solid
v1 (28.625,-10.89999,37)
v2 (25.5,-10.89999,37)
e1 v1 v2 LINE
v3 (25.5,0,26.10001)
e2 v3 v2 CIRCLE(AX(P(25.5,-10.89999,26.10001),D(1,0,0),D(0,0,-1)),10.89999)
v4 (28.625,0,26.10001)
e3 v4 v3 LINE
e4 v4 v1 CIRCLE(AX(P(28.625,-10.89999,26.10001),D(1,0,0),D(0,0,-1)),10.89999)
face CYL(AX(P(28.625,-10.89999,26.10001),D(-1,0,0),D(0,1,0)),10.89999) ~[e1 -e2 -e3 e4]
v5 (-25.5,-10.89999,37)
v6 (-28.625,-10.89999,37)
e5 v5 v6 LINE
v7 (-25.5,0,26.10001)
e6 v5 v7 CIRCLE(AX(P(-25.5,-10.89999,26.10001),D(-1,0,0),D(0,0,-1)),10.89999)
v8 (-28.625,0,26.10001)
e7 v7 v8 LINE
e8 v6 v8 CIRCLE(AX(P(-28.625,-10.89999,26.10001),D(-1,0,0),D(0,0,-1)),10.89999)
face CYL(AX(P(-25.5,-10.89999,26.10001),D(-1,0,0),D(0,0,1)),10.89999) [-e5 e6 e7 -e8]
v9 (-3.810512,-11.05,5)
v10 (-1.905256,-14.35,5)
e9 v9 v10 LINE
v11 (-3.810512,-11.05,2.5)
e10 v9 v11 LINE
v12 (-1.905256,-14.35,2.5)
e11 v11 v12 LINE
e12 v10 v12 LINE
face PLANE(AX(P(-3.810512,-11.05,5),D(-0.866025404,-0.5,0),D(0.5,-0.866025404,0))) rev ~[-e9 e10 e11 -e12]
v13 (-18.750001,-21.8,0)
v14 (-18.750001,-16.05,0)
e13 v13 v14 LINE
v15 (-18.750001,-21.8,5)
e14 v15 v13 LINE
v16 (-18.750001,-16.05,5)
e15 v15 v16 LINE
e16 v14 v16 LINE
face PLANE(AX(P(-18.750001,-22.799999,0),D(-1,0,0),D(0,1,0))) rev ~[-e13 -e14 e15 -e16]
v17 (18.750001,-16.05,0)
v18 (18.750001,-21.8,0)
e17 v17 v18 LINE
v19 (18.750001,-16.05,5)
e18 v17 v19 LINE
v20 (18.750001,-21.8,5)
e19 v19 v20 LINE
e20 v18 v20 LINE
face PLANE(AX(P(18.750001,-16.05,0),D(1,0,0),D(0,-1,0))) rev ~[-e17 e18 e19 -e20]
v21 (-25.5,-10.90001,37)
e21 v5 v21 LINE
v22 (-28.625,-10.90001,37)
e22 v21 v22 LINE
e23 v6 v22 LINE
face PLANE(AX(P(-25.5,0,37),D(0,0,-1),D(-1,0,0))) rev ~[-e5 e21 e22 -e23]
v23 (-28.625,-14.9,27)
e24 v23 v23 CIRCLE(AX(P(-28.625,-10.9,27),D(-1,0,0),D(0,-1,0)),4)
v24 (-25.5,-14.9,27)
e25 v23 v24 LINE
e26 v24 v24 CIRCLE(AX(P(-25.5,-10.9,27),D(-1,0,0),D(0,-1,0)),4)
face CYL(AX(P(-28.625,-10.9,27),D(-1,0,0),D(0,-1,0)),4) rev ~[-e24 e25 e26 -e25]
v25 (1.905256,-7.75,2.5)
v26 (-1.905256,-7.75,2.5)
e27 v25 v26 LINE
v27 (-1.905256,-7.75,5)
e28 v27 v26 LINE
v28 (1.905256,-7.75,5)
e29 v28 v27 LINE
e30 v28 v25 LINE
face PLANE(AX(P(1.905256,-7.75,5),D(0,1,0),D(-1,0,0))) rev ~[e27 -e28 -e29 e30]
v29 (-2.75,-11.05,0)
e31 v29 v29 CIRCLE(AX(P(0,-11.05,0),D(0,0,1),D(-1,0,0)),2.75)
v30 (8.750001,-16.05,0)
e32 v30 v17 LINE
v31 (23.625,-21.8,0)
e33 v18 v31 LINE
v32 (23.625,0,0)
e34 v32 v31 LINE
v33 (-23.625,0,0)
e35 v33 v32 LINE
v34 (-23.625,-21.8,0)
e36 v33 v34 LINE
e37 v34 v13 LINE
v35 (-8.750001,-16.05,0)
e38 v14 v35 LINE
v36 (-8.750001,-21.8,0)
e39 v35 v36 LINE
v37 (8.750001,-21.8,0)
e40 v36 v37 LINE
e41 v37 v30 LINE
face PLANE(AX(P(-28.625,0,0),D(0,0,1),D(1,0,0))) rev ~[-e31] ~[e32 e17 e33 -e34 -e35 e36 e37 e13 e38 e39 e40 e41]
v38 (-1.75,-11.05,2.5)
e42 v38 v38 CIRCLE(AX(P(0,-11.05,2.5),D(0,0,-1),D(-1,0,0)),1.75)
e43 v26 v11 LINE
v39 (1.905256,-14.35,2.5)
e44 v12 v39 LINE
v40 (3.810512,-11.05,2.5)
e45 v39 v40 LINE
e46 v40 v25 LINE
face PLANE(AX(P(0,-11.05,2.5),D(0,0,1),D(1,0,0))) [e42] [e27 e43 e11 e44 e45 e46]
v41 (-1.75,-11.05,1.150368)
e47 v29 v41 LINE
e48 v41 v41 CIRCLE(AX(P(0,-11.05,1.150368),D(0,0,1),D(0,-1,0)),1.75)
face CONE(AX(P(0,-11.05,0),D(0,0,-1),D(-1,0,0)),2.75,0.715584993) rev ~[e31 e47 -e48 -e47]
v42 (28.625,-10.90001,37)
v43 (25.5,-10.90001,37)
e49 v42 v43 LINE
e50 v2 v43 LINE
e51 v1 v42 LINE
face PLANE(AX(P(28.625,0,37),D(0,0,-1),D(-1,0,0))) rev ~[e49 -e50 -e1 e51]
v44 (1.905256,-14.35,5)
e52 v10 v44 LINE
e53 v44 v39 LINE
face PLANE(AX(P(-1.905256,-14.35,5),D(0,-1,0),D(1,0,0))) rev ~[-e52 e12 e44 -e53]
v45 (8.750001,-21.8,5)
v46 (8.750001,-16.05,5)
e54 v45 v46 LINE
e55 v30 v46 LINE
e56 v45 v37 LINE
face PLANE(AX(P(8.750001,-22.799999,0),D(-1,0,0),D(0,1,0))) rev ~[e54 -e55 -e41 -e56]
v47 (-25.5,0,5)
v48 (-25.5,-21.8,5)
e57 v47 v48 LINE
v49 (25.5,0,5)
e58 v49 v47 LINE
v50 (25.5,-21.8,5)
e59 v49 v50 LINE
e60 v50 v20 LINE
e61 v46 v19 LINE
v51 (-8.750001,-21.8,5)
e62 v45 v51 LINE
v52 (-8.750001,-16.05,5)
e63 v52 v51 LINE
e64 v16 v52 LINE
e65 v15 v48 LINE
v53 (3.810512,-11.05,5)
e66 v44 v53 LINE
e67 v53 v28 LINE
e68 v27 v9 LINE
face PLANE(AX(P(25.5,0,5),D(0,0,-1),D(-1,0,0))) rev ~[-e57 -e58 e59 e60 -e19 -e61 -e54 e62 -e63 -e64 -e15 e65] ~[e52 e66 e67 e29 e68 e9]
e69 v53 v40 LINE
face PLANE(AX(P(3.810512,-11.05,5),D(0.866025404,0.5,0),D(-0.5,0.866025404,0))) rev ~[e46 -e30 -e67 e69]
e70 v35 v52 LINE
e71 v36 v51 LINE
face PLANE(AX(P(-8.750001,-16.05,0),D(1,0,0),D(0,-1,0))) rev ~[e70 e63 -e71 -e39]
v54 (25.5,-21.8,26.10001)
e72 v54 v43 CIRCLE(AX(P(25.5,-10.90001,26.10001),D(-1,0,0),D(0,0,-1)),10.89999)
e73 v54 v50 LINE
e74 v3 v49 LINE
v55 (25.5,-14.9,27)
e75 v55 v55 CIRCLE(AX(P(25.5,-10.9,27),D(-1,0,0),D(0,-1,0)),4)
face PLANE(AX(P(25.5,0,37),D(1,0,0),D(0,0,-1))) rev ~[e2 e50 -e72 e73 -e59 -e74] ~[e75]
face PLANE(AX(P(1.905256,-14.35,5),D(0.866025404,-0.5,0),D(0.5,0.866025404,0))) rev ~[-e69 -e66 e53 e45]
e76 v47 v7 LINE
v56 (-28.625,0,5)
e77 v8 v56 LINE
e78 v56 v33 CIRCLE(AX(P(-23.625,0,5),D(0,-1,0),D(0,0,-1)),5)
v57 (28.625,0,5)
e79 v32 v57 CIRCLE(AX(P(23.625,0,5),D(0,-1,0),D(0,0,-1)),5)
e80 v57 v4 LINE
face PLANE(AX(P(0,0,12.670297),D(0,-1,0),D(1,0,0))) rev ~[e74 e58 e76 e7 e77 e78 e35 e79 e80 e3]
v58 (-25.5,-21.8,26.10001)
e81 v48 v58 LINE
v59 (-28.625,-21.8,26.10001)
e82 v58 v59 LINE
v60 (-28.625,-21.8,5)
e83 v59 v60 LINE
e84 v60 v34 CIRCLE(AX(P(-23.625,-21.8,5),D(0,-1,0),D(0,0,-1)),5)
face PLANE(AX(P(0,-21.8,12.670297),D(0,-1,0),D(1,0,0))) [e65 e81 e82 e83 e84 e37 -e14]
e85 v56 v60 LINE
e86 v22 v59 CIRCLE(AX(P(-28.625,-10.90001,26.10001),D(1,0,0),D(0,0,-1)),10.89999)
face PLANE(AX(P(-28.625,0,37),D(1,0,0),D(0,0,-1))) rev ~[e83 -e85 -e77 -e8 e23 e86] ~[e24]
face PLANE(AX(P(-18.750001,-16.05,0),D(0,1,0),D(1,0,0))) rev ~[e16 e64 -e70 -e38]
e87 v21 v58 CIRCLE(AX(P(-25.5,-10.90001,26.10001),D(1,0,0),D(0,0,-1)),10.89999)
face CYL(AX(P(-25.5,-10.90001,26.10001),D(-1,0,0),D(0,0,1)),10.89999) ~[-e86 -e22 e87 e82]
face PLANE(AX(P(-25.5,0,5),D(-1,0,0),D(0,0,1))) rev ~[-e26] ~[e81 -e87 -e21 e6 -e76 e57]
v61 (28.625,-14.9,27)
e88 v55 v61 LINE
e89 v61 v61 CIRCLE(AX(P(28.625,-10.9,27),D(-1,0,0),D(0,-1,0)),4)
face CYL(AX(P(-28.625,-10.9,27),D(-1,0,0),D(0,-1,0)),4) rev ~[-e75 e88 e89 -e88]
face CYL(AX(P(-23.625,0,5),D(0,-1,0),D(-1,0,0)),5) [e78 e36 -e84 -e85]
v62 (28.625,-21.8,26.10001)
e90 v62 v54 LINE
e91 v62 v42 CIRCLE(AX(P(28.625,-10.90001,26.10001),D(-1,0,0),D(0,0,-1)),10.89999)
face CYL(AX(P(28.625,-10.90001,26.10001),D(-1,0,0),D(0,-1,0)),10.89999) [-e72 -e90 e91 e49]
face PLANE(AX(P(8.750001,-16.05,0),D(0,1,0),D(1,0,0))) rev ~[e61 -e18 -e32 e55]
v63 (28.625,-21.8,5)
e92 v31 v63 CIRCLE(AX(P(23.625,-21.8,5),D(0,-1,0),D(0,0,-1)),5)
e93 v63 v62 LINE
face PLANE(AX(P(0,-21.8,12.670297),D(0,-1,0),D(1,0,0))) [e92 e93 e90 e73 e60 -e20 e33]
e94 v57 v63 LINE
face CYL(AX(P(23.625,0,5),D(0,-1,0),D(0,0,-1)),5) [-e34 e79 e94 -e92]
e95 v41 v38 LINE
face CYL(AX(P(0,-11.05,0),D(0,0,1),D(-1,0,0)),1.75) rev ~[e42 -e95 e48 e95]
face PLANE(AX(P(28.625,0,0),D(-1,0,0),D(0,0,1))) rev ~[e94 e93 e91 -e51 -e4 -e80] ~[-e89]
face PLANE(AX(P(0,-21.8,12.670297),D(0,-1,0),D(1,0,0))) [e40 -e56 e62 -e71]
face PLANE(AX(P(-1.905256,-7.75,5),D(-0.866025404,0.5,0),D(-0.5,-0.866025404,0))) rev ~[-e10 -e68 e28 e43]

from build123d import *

# Parameters (mm, degrees)
F1_DEPTH       = 21.8
F2_R           = 4
F3_DEPTH       = 69.8
F4_R           = 10.89999
F5_W           = 10
F5_H           = 5.75
F5_H_2         = 0.9999994934
F6_DEPTH       = 25
F7_D           = 3.5
F7_DEPTH       = 10
F7_CSINK_D     = 5.5
F7_CSINK_ANGLE = 82
F7_TIP         = 1.0515060833
F8_R           = 1.75
F9_DEPTH       = 2.5
F10_R          = 5


# Not quite as in the source:
# - a fillet or chamfer is up to 0.001 mm smaller than in the source, because OpenCascade refuses the exact size


with BuildPart() as f1:
    # F0 (on Front) → F1 (new body)
    with BuildSketch(Plane.XZ):
        Polygon((-25.5, 37), (-28.625, 37), (-28.625, 0), (28.625, 0), (28.625, 37), (25.5, 37), (25.5, 5), (-25.5, 5), align=None)
    extrude(amount=F1_DEPTH)

    # F2 (on face) → F3 (cut)
    with BuildSketch(Plane(origin=(-28.625, 0, 0), x_dir=(0, -1, 0), z_dir=(-1, 0, 0))):
        with Locations((10.9, 27)):
            Circle(F2_R)
    extrude(amount=-F3_DEPTH, mode=Mode.SUBTRACT)

    # F4 (radius 10.9 in the source; OpenCascade refuses exactly that, so slightly less here)
    f4_edges = [f1.edges().sort_by_distance(p)[0] for p in [
        (-27.0625, -21.8, 37),
        (-27.0625, 0, 37),
        (27.0625, 0, 37),
        (27.0625, -21.8, 37),
    ]]
    fillet(f4_edges, radius=F4_R)

    # F5 (on face) → F6 (cut)
    with BuildSketch(Plane(origin=(0, 0, 0), x_dir=(1, 0, 0), z_dir=(0, 0, -1))):
        with Locations((-13.7500007451, 18.925)):
            Rectangle(F5_W, F5_H)
        with Locations((-13.7500007451, 22.2999997467)):
            Rectangle(F5_W, F5_H_2)
        with Locations((13.7500007451, 22.2999997467)):
            Rectangle(F5_W, F5_H_2)
        with Locations((13.7500007451, 18.925)):
            Rectangle(F5_W, F5_H)
    extrude(amount=-F6_DEPTH, mode=Mode.SUBTRACT)

    # F7
    with Locations(Plane(origin=(0, 0, 0), x_dir=(1, 0, 0), z_dir=(0, 0, -1))):
        with Locations((0, 11.05)):
            CounterSinkHole(F7_D / 2, F7_CSINK_D / 2, depth=F7_DEPTH, counter_sink_angle=F7_CSINK_ANGLE)
            with Locations((0, 0, -(F7_DEPTH + F7_TIP / 2))):  # 118° drill point
                Cone(0, F7_D / 2, F7_TIP, mode=Mode.SUBTRACT)

    # F8 (on face) → F9 (cut)
    with BuildSketch(Plane.XY.offset(5)):
        Polygon((1.9052558883, -7.75), (-1.9052558883, -7.75), (-3.8105117767, -11.05), (-1.9052558883, -14.35), (1.9052558883, -14.35), (3.8105117767, -11.05), align=None)
        with Locations((0, -11.05)):
            Circle(F8_R, mode=Mode.SUBTRACT)
    extrude(amount=-F9_DEPTH, mode=Mode.SUBTRACT)

    # F10
    f10_edges = [f1.edges().sort_by_distance(p)[0] for p in [
        (-28.625, -10.9, 0),
        (28.625, -10.9, 0),
    ]]
    fillet(f10_edges, radius=F10_R)


solid = f1.part
